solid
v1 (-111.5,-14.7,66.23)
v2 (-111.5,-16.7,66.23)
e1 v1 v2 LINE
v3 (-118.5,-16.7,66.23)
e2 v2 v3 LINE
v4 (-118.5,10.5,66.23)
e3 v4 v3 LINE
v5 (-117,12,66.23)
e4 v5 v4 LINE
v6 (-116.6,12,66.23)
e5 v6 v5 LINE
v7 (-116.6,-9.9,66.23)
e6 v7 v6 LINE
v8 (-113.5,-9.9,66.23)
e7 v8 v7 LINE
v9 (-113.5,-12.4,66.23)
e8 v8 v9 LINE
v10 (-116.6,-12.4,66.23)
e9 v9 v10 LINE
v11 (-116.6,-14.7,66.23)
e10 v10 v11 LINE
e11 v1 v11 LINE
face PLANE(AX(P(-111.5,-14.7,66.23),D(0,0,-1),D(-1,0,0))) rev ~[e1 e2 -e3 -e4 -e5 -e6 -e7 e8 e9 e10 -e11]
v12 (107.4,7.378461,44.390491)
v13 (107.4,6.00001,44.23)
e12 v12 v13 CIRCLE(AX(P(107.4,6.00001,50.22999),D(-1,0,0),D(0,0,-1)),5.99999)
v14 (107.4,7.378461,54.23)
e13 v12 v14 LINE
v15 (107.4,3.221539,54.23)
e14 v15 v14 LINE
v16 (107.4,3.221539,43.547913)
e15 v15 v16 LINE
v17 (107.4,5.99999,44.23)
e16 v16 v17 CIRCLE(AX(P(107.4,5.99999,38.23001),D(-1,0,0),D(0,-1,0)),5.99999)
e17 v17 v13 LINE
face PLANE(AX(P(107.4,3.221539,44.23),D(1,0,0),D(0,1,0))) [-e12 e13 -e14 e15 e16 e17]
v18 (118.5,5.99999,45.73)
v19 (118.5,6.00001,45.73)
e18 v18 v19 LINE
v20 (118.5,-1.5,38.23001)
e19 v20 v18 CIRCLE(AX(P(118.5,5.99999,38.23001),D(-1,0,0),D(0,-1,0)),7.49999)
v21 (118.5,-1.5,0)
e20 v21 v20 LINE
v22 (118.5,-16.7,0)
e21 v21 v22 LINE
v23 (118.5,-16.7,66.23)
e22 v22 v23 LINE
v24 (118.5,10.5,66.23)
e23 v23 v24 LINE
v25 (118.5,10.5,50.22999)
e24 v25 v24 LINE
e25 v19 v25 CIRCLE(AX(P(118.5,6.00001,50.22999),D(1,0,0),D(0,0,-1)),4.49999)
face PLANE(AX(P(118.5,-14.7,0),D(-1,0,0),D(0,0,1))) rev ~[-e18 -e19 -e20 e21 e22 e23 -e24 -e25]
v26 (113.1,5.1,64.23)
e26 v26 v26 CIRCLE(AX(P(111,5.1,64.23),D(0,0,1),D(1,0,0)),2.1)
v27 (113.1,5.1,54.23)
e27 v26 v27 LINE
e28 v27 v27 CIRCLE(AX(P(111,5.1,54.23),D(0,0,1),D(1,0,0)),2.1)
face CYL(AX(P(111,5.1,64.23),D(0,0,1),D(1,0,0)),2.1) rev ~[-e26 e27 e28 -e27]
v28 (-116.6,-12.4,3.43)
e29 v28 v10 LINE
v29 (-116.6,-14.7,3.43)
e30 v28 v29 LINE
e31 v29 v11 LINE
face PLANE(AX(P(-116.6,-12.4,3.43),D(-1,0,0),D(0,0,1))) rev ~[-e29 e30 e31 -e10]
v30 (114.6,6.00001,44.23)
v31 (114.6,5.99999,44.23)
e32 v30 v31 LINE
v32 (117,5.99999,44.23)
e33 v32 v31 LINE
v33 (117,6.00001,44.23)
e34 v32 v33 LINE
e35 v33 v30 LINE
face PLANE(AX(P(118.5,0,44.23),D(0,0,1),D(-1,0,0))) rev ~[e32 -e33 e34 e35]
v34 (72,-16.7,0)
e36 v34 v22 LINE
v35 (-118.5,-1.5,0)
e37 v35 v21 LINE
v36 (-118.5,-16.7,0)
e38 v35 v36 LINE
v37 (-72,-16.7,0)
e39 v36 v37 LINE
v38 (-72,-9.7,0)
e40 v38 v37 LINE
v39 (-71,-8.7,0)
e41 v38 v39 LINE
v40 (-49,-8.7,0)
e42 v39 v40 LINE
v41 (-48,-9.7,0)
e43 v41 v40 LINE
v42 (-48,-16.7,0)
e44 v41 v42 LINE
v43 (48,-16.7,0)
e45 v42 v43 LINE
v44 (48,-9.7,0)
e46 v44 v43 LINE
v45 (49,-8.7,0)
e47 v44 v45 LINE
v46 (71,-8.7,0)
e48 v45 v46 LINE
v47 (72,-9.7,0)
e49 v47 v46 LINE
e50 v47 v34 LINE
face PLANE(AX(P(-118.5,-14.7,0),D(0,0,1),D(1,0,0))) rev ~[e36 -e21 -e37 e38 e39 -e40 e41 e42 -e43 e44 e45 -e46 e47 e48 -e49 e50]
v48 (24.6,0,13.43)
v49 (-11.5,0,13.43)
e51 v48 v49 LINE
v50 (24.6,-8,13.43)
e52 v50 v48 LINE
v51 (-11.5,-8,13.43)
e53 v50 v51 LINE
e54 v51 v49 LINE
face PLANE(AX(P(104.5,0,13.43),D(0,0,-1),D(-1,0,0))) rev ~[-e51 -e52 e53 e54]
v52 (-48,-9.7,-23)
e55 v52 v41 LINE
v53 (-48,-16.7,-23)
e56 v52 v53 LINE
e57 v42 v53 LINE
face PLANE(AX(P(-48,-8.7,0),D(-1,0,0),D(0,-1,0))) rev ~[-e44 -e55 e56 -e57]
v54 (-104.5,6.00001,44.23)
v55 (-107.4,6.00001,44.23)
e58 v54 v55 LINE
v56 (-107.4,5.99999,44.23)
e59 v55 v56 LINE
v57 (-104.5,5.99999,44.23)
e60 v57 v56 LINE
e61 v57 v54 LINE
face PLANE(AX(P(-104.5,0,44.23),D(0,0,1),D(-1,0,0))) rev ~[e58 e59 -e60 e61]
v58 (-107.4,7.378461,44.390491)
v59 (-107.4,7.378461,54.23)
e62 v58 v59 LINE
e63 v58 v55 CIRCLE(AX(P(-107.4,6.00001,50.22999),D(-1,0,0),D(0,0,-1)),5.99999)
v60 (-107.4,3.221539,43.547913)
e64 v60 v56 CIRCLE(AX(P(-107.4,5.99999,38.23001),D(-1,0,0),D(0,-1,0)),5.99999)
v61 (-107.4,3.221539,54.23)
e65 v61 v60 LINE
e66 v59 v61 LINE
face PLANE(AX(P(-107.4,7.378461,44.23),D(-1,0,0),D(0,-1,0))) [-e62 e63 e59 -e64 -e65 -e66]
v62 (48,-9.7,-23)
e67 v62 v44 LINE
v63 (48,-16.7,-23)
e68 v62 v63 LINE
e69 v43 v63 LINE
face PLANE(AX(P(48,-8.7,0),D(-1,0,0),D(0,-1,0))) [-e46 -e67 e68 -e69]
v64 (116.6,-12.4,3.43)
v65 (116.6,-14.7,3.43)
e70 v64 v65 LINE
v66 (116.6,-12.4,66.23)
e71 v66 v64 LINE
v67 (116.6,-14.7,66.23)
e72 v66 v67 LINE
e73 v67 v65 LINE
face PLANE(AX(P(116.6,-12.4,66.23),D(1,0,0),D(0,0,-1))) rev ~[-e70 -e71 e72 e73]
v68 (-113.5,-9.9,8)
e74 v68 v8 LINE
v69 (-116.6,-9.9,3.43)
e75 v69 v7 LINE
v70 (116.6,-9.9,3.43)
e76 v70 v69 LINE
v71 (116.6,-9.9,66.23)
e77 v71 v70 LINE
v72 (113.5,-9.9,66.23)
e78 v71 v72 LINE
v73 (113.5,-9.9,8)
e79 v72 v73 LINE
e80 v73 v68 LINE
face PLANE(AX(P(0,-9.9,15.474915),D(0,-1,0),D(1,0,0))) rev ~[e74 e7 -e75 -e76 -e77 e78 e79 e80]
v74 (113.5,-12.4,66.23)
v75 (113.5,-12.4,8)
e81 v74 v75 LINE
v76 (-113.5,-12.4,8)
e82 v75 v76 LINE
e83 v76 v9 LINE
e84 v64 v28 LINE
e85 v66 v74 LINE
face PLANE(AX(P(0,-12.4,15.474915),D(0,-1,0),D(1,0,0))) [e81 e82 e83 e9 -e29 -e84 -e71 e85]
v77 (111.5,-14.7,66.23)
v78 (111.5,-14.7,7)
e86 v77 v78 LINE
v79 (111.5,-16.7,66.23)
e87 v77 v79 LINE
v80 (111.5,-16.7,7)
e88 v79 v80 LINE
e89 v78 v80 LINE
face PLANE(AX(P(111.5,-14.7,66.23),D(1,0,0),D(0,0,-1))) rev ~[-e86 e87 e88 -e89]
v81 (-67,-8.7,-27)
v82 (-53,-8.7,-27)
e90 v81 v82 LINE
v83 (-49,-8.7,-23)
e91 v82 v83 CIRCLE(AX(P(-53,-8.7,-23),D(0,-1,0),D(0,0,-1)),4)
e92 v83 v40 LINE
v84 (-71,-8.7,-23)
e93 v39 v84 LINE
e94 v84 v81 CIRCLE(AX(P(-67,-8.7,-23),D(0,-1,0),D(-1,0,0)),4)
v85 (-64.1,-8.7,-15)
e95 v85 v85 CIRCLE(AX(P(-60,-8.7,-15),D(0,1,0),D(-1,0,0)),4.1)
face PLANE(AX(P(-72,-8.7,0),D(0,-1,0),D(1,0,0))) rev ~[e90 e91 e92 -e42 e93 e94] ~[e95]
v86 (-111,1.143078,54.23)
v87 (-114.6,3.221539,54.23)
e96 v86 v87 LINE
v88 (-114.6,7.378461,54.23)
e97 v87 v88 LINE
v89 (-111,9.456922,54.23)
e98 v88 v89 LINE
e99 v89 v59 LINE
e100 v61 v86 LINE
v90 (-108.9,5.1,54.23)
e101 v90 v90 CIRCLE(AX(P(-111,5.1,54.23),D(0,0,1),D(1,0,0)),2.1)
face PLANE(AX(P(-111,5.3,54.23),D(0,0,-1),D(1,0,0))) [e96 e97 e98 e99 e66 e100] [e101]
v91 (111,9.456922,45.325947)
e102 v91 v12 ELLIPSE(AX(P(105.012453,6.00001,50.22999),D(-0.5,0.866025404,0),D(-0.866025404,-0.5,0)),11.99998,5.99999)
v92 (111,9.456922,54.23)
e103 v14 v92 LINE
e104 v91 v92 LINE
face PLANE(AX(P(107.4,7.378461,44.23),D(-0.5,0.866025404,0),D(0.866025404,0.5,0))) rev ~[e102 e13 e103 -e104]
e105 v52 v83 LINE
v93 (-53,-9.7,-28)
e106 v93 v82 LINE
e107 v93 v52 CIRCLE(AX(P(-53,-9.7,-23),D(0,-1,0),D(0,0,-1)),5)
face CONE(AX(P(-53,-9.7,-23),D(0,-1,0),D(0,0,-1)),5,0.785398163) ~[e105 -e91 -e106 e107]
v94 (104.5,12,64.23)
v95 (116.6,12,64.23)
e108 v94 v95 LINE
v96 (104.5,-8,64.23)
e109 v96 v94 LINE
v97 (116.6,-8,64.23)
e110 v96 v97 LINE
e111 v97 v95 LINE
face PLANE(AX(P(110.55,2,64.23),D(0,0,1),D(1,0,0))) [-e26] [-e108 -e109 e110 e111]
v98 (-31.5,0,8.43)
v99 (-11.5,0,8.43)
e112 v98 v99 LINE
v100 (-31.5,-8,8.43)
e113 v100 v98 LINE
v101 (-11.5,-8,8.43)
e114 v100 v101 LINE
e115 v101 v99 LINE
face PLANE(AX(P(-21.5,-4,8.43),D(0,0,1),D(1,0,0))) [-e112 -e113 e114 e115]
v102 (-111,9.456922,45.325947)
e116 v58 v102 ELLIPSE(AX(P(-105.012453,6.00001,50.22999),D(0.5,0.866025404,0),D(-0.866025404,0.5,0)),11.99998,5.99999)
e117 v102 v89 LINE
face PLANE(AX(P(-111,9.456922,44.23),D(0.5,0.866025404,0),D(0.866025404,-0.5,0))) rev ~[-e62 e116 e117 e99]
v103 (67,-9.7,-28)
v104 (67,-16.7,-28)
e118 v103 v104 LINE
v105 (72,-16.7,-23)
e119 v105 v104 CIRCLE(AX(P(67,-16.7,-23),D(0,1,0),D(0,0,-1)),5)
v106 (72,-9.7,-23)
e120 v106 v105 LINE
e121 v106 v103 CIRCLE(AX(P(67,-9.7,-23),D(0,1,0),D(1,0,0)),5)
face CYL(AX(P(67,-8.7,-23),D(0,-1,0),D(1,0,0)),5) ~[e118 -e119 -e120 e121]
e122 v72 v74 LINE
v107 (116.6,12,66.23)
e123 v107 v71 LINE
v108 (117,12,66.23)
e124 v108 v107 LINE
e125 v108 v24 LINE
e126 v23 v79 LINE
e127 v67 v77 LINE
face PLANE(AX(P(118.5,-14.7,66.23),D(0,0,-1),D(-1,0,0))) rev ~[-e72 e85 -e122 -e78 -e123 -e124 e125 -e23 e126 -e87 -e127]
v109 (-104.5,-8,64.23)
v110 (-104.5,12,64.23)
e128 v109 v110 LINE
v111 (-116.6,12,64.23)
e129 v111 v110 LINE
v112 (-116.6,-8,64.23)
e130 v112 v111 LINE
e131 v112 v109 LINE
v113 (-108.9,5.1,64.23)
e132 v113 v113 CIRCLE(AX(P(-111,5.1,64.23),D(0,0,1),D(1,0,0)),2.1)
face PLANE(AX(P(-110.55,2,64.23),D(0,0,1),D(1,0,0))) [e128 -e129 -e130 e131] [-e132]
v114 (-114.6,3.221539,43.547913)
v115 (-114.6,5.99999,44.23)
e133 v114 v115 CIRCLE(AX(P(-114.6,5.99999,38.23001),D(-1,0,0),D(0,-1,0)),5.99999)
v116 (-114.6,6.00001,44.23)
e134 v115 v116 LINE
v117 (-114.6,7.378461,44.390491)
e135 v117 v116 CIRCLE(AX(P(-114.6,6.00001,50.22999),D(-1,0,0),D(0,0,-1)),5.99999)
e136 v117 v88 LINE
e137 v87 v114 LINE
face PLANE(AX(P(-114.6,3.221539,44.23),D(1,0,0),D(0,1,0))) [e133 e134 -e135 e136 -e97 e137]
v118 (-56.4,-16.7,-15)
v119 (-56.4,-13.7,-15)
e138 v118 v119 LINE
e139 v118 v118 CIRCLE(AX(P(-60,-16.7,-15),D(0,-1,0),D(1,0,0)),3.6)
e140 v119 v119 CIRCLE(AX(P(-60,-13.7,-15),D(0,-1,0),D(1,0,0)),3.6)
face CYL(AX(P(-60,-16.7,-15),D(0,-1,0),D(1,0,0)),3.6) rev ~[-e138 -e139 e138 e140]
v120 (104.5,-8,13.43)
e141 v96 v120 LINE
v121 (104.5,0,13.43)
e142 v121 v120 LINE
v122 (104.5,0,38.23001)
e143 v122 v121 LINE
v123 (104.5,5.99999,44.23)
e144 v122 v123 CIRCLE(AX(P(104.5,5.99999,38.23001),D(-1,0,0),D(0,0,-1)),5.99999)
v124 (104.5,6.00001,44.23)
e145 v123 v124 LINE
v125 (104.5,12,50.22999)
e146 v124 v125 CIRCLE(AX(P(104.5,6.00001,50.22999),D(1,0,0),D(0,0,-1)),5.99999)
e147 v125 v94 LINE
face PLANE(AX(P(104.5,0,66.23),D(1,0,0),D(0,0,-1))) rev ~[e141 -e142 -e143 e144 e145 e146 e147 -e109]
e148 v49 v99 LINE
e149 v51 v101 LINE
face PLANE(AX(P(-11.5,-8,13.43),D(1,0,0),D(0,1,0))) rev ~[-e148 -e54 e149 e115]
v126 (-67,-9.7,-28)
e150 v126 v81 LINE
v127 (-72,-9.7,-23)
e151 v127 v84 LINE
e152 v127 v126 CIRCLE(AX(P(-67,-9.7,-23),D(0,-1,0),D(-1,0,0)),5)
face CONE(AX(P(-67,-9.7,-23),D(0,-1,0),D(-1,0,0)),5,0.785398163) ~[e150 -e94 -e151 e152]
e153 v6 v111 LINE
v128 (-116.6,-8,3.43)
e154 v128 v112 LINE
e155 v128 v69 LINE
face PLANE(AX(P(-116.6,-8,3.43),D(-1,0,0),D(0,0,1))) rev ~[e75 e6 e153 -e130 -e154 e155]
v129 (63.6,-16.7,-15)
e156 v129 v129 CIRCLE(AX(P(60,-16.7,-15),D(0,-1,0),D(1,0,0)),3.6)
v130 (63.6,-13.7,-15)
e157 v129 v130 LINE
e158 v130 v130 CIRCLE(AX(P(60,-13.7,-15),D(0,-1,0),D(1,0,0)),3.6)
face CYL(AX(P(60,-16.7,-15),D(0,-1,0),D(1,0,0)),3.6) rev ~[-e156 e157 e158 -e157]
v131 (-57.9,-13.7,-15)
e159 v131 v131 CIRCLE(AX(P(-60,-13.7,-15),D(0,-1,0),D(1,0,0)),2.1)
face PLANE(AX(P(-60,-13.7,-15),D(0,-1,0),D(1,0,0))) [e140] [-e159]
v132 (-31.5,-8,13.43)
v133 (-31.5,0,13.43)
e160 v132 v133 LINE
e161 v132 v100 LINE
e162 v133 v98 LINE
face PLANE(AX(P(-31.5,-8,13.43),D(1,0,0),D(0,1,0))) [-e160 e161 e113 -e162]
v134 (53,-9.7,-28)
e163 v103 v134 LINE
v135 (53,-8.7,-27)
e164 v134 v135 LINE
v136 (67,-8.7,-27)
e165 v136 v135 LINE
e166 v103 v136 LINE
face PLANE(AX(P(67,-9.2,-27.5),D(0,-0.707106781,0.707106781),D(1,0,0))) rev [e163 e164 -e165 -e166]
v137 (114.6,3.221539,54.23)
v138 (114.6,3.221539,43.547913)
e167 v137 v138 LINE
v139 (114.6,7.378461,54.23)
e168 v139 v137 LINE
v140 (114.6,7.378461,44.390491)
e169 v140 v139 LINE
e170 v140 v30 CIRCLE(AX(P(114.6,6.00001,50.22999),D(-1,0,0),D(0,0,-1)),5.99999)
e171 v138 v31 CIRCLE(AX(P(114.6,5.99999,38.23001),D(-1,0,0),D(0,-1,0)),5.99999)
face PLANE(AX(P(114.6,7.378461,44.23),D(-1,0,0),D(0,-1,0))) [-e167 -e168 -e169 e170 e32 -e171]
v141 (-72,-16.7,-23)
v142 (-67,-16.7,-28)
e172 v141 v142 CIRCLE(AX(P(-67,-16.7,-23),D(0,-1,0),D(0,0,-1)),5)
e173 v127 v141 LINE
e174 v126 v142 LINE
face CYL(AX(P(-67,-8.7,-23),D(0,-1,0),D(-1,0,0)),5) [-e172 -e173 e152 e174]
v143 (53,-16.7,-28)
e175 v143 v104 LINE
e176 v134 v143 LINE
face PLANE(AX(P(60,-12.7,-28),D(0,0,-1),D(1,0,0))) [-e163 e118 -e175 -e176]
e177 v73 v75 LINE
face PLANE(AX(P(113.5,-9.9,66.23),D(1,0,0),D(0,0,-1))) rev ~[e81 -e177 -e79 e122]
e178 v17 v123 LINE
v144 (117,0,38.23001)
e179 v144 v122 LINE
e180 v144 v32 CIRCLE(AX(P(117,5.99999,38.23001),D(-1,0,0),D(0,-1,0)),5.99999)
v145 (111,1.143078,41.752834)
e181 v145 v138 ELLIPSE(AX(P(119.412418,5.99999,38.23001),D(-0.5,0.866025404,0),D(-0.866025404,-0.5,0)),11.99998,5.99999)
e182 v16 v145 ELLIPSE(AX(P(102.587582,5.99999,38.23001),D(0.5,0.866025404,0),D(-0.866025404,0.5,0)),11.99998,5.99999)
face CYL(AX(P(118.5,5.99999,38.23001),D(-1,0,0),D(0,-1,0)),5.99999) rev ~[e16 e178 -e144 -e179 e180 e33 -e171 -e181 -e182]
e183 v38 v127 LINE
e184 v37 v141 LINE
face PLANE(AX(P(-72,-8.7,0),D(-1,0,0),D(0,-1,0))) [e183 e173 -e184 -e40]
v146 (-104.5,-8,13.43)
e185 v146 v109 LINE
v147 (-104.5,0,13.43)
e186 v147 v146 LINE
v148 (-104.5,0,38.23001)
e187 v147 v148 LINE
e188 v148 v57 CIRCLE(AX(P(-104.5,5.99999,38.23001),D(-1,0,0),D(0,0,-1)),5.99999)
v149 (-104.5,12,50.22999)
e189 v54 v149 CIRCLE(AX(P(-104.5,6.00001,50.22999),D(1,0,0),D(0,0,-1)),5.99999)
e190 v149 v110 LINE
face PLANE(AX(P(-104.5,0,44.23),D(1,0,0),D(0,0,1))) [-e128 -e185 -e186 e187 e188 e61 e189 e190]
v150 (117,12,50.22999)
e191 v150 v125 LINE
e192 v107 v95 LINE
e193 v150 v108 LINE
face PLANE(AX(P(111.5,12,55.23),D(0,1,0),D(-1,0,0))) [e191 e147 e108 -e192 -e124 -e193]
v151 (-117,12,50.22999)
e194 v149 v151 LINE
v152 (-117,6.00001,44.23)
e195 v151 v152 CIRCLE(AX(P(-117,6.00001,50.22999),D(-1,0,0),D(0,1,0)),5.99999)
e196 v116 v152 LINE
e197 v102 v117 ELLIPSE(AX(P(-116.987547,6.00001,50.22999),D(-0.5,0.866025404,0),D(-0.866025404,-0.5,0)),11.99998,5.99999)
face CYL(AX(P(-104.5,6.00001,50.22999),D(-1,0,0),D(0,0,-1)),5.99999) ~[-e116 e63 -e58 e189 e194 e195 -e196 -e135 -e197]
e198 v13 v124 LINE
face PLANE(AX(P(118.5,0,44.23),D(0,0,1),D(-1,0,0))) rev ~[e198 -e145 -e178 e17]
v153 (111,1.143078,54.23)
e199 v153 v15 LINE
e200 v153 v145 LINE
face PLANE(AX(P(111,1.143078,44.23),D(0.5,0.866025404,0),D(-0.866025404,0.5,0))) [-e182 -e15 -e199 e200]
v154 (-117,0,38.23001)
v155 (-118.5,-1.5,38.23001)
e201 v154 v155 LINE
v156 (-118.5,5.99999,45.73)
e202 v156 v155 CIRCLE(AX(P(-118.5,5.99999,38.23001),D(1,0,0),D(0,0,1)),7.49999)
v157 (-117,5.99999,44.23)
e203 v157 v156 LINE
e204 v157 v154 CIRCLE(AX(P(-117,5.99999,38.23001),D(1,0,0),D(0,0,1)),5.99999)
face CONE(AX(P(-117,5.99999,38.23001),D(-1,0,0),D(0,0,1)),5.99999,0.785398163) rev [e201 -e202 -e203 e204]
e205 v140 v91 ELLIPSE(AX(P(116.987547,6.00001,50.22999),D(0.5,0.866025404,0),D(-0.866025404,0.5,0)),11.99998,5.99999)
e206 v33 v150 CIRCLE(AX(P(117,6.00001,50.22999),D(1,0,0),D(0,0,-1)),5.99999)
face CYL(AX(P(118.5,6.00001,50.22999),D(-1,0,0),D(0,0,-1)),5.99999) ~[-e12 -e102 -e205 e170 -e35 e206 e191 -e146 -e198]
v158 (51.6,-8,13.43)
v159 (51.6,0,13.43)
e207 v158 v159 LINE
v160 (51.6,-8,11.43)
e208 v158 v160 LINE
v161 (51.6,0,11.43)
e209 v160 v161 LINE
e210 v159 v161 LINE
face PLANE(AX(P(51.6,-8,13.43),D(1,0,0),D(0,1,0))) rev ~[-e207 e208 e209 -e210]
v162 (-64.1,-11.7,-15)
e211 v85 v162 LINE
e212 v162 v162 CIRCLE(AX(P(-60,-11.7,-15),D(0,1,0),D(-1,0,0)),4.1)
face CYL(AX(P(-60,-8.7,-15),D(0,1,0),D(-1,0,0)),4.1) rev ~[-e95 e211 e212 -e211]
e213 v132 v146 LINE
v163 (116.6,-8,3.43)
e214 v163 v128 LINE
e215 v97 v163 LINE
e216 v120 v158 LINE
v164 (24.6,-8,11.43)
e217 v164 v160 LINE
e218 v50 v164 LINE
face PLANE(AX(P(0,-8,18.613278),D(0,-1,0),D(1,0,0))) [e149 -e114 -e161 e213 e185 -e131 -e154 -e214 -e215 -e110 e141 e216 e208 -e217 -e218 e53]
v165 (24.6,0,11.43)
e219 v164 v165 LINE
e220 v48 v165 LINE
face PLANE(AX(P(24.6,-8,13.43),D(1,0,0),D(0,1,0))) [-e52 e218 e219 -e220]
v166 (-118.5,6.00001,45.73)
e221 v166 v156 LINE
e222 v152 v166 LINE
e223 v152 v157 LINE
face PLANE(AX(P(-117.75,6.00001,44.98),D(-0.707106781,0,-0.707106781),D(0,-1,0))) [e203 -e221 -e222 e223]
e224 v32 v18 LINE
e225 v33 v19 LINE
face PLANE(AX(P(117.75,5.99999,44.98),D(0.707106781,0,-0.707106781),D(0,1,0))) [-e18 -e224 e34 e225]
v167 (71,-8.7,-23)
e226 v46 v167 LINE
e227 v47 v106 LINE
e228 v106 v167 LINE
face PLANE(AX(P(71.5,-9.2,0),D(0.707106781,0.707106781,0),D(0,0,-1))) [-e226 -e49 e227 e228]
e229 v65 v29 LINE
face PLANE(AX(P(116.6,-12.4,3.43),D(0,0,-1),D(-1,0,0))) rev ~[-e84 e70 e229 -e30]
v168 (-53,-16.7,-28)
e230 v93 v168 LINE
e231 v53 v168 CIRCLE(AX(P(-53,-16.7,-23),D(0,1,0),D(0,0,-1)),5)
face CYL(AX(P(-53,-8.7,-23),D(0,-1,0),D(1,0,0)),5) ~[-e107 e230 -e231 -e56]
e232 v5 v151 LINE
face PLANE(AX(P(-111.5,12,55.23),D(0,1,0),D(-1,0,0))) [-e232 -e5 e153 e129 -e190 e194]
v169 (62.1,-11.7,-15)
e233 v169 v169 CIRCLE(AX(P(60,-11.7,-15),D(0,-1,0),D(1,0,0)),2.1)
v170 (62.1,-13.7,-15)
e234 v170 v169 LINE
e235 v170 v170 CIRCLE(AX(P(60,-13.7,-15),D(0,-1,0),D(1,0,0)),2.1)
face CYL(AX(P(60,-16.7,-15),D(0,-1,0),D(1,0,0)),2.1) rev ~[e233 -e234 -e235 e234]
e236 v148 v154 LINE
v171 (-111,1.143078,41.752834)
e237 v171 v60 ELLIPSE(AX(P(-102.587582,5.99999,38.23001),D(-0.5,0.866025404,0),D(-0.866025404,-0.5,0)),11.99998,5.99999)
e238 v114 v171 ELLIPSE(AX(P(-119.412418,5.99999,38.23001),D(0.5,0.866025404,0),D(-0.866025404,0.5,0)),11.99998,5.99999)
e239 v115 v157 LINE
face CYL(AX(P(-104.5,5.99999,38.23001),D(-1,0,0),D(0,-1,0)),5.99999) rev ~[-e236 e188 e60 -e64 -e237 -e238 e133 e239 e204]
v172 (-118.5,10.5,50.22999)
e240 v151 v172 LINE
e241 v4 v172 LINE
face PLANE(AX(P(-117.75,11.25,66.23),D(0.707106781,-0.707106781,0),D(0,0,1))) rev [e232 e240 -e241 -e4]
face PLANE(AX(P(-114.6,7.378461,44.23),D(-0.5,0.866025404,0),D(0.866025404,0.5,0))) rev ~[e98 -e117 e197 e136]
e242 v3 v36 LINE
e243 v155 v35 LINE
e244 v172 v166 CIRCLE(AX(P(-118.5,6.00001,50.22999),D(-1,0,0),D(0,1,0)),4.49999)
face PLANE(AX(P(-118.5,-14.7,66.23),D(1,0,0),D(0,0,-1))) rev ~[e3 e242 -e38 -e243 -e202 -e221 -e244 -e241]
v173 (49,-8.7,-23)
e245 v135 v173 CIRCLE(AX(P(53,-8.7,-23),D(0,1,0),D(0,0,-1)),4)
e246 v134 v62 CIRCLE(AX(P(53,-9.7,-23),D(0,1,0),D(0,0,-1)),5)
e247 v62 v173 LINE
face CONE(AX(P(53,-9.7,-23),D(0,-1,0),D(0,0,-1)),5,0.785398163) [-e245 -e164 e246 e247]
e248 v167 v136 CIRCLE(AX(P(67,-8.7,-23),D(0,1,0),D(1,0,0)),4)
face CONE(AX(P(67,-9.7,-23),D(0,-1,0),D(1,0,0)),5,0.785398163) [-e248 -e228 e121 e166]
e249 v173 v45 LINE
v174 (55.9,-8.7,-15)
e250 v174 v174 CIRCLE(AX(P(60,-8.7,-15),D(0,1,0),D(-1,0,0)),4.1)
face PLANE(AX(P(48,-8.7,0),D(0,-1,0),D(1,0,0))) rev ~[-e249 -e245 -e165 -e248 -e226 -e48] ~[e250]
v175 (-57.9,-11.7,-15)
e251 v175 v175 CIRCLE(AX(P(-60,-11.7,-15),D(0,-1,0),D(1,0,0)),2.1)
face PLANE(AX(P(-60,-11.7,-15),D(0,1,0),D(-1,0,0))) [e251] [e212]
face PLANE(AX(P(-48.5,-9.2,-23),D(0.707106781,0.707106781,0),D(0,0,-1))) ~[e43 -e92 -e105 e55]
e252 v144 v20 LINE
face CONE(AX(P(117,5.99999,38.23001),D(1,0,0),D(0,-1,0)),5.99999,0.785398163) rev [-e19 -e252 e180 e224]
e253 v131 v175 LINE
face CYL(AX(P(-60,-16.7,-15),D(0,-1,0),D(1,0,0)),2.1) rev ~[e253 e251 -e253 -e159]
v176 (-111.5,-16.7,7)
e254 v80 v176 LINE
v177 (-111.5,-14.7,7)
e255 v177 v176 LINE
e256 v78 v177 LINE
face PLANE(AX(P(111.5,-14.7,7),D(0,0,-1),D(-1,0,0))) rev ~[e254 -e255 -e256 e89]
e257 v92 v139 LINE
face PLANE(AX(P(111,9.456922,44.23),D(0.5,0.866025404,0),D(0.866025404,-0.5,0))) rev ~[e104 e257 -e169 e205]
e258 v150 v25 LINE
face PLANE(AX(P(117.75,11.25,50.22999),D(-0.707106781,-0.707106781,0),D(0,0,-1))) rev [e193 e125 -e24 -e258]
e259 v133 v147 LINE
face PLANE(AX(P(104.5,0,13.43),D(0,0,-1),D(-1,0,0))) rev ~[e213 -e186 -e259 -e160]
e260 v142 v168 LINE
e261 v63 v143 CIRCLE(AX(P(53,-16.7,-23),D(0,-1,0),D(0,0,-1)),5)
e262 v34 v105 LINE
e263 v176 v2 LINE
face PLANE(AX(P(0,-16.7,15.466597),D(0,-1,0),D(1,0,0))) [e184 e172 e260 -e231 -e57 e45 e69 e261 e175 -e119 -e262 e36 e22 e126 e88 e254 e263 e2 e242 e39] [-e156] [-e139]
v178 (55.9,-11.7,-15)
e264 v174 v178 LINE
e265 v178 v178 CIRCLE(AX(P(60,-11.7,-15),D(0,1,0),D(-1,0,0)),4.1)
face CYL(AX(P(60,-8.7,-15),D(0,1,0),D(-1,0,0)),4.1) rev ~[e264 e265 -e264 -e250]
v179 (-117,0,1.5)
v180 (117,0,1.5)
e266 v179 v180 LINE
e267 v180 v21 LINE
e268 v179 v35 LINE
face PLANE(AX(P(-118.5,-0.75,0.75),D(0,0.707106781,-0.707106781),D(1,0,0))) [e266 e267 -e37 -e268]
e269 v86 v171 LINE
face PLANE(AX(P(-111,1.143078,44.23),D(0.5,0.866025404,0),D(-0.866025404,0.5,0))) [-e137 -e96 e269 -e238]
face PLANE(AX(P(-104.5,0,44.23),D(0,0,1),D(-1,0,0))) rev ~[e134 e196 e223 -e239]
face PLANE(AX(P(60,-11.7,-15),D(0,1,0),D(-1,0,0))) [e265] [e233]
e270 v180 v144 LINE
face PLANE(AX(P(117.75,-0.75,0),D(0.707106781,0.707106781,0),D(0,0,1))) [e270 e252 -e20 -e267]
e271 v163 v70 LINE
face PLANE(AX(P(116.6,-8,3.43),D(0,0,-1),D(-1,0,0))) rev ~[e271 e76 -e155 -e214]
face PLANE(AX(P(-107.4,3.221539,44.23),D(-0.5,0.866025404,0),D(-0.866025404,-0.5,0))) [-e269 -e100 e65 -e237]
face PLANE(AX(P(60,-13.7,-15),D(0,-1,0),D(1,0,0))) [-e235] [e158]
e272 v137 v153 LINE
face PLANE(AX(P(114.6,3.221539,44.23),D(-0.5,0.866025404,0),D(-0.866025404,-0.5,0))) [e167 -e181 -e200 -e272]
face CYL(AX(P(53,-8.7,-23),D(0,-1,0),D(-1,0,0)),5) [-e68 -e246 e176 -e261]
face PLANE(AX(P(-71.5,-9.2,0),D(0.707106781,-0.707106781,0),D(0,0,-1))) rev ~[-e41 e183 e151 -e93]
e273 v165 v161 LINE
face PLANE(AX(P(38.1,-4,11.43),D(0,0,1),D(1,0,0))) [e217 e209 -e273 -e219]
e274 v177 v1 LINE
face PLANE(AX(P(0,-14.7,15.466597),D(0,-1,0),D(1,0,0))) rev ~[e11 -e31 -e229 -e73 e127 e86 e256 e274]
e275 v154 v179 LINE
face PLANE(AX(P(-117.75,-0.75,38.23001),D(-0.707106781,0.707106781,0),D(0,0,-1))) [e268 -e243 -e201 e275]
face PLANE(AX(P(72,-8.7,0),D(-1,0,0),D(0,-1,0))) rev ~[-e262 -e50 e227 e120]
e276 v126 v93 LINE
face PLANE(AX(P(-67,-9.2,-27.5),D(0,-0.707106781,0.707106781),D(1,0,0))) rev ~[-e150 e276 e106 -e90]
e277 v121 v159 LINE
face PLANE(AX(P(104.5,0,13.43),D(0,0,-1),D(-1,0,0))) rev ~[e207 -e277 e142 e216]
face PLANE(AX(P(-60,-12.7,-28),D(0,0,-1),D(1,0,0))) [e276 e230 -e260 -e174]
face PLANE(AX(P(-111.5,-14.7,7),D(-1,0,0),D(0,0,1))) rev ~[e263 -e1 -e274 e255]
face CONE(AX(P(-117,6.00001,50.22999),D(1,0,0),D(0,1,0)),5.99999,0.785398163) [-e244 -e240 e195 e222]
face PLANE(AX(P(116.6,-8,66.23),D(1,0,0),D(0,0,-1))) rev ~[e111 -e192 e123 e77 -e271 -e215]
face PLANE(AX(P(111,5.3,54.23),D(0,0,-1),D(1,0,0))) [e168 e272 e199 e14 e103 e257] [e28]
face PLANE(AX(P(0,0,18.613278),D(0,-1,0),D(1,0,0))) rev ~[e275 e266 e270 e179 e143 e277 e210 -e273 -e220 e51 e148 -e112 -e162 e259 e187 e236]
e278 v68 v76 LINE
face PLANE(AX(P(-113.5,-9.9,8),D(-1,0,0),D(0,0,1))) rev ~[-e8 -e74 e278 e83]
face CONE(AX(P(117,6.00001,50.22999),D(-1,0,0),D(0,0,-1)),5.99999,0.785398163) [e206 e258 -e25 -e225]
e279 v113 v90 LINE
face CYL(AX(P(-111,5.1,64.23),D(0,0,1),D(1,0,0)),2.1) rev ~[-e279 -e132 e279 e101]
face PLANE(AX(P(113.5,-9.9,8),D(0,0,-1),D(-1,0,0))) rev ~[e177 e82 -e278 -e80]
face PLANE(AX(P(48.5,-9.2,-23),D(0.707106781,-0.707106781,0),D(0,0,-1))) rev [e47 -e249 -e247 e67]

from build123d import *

# Parameters (mm, degrees)
F1_DEPTH  = 8
F3_DEPTH  = 1.9
F5_DEPTH  = 2.5
F7_DEPTH  = 2.3
F9_W      = 14
F9_H      = 22
F10_DEPTH = 12
F11_DEPTH = 2
F12_W     = 12.1
F12_H     = 20
F13_W     = 12.1
F13_H     = 20
F14_DEPTH = 2
F17_R     = 5.99999
F18_R     = 5.99999
F19_DEPTH = 10
F20_DEPTH = 25
F22_R     = 2.1
F21_R     = 2.1
F23_DEPTH = 10
F24_SIZE  = 1.5
F25_W     = 24
F25_H     = 8
F26_DEPTH = 28
F28_R     = 4.1
F27_R     = 4.1
F29_DEPTH = 3
F30_R     = 2.1
F31_DEPTH = 28.701
F32_R     = 3.6
F33_DEPTH = 3
F34_R     = 5
F35_W     = 20
F35_H     = 8
F36_DEPTH = 5
F37_SIZE  = 1
F38_W     = 27
F38_H     = 8
F39_DEPTH = 2


# Not quite as in the source:
# - a fillet or chamfer is up to 0.001 mm smaller than in the source, because OpenCascade refuses the exact size
# - a feature names something its author has since deleted; it is built from what else it names


with BuildPart() as f1:
    # F0 (on Front) → F1 (new body)
    with BuildSketch(Plane.XZ):
        Polygon((-118.5, 0), (118.5, 0), (118.5, 66.23), (104.5, 66.23), (104.5, 13.43), (-104.5, 13.43), (-104.5, 66.23), (-118.5, 66.23), align=None)
    extrude(amount=F1_DEPTH)

    # F2 (on face) → F3 (join)
    with BuildSketch(Plane.XZ.offset(8)):
        Polygon((-116.6, 66.23), (-118.5, 66.23), (-118.5, 0), (118.5, 0), (118.5, 66.23), (116.6, 66.23), (116.6, 3.43), (-116.6, 3.43), align=None)
    extrude(amount=F3_DEPTH)

    # F4 (on face) → F5 (join)
    with BuildSketch(Plane.XZ.offset(9.9)):
        Polygon((-113.5, 66.23), (-118.5, 66.23), (-118.5, 0), (118.5, 0), (118.5, 66.23), (113.5, 66.23), (113.5, 8), (-113.5, 8), align=None)
    extrude(amount=F5_DEPTH)

    # F6 (on face) → F7 (join)
    with BuildSketch(Plane.XZ.offset(12.4)):
        Polygon((-116.6, 66.23), (-118.5, 66.23), (-118.5, 0), (118.5, 0), (118.5, 66.23), (116.6, 66.23), (116.6, 3.43), (-116.6, 3.43), align=None)
    extrude(amount=F7_DEPTH)

    # F9 (on face) → F10 (join)
    with BuildSketch(Plane(origin=(0, 0, 0), x_dir=(-1, 0, 0), z_dir=(0, 1, 0))):
        with Locations((111.5, 55.23)):
            Rectangle(F9_W, F9_H)
        with Locations((-111.5, 55.23)):
            Rectangle(F9_W, F9_H)
    extrude(amount=F10_DEPTH)

    # F8 (on face) → F11 (join)
    with BuildSketch(Plane.XZ.offset(14.7)):
        Polygon((-111.5, 66.23), (-118.5, 66.23), (-118.5, 0), (118.5, 0), (118.5, 66.23), (111.5, 66.23), (111.5, 7), (-111.5, 7), align=None)
    extrude(amount=F11_DEPTH)

    # F12 (on face) + F13 (on face) → F14 (cut)
    with BuildSketch(Plane.XY.offset(66.23)):
        with Locations((-110.55, 2)):
            Rectangle(F12_W, F12_H)
    with BuildSketch(Plane.XY.offset(66.23)):
        with Locations((110.55, 2)):
            Rectangle(F13_W, F13_H)
    extrude(amount=-F14_DEPTH, mode=Mode.SUBTRACT)

    # F17 (radius 6 in the source; OpenCascade refuses exactly that, so slightly less here)
    f17_edges = [f1.edges().sort_by_distance(p)[0] for p in [
        (-111.5, 0, 44.23),
        (-111.5, 12, 44.23),
    ]]
    fillet(f17_edges, radius=F17_R)

    # F18 (radius 6 in the source; OpenCascade refuses exactly that, so slightly less here)
    f18_edges = [f1.edges().sort_by_distance(p)[0] for p in [
        (111.5, 0, 44.23),
        (111.5, 12, 44.23),
    ]]
    fillet(f18_edges, radius=F18_R)

    # F15 (on face) + F16 (on face) → F19 (cut)
    with BuildSketch(Plane(origin=(0, 0, 44.23), x_dir=(1, 0, 0), z_dir=(0, 0, -1))):
        Polygon((111, -1.1430780618), (107.4, -3.2215390309), (107.4, -7.3784609691), (111, -9.4569219382), (114.6, -7.3784609691), (114.6, -3.2215390309), align=None)
    with BuildSketch(Plane(origin=(0, 0, 44.23), x_dir=(1, 0, 0), z_dir=(0, 0, -1))):
        Polygon((-107.4, -7.3784609691), (-107.4, -3.2215390309), (-111, -1.1430780618), (-114.6, -3.2215390309), (-114.6, -7.3784609691), (-111, -9.4569219382), align=None)
    extrude(amount=-F19_DEPTH, mode=Mode.SUBTRACT)

    # F15 (on face) + F16 (on face) → F20 (cut)
    with BuildSketch(Plane(origin=(0, 0, 44.23), x_dir=(1, 0, 0), z_dir=(0, 0, -1))):
        Polygon((111, -1.1430780618), (107.4, -3.2215390309), (107.4, -7.3784609691), (111, -9.4569219382), (114.6, -7.3784609691), (114.6, -3.2215390309), align=None)
    with BuildSketch(Plane(origin=(0, 0, 44.23), x_dir=(1, 0, 0), z_dir=(0, 0, -1))):
        Polygon((-107.4, -7.3784609691), (-107.4, -3.2215390309), (-111, -1.1430780618), (-114.6, -3.2215390309), (-114.6, -7.3784609691), (-111, -9.4569219382), align=None)
    extrude(amount=F20_DEPTH, mode=Mode.SUBTRACT)

    # F22 (on face) + F21 (on face) → F23 (cut, through all)
    with BuildSketch(Plane.XY.offset(64.23)):
        with Locations((111, 5.1)):
            Circle(F22_R)
    with BuildSketch(Plane.XY.offset(64.23)):
        with Locations((-111, 5.1)):
            Circle(F21_R)
    extrude(amount=-F23_DEPTH, mode=Mode.SUBTRACT)

    # F24
    f24_edges = [f1.edges().sort_by_distance(p)[0] for p in [
        (118.5, 0, 19.115005),
        (-118.5, 0, 19.115005),
        (0, 0, 0),
        (118.5, 12, 58.229995),
        (118.5, 10.242644, 45.987356),
        (118.5, 6, 44.23),
        (118.5, 1.757356, 42.472644),
        (-118.5, 1.757356, 42.472644),
        (-118.5, 6, 44.23),
        (-118.5, 10.242644, 45.987356),
        (-118.5, 12, 58.229995),
    ]]
    chamfer(f24_edges, length=F24_SIZE)

    # F25 (on face) → F26 (join)
    with BuildSketch(Plane(origin=(0, 0, 0), x_dir=(1, 0, 0), z_dir=(0, 0, -1))):
        with Locations((-60, 12.7)):
            Rectangle(F25_W, F25_H)
        with Locations((60, 12.7)):
            Rectangle(F25_W, F25_H)
    extrude(amount=F26_DEPTH)

    # F28 (on face) + F27 (on face) → F29 (cut)
    with BuildSketch(Plane(origin=(0, -8.7, 0), x_dir=(-1, 0, 0), z_dir=(0, 1, 0))):
        with Locations((-60, -15)):
            Circle(F28_R)
    with BuildSketch(Plane(origin=(0, -8.7, 0), x_dir=(-1, 0, 0), z_dir=(0, 1, 0))):
        with Locations((60, -15)):
            Circle(F27_R)
    extrude(amount=-F29_DEPTH, mode=Mode.SUBTRACT)

    # F30 (on face) → F31 (cut, through all)
    with BuildSketch(Plane.XZ.offset(16.7)):
        with Locations((-60, -15)):
            Circle(F30_R)
        with Locations((60, -15)):
            Circle(F30_R)
    extrude(amount=-F31_DEPTH, mode=Mode.SUBTRACT)

    # F32 (on face) → F33 (cut)
    with BuildSketch(Plane.XZ.offset(16.7)):
        with Locations((-60, -15)):
            Circle(F32_R)
        with Locations((60, -15)):
            Circle(F32_R)
    extrude(amount=-F33_DEPTH, mode=Mode.SUBTRACT)

    # F34
    f34_edges = [f1.edges().sort_by_distance(p)[0] for p in [
        (-72, -12.7, -28),
        (-48, -12.7, -28),
        (48, -12.7, -28),
        (72, -12.7, -28),
    ]]
    fillet(f34_edges, radius=F34_R)

    # F35 (on face) → F36 (cut)
    with BuildSketch(Plane.XY.offset(13.43)):
        with Locations((-21.5, -4)):
            Rectangle(F35_W, F35_H)
    extrude(amount=-F36_DEPTH, mode=Mode.SUBTRACT)

    # F37
    f37_edges = [f1.edges().sort_by_distance(p)[0] for p in [
        (-72, -8.7, -11.5),
        (72, -8.7, -11.5),
        (48, -8.7, -11.5),
        (-48, -8.7, -11.5),
        (-70.535534, -8.7, -26.535534),
        (-60, -8.7, -28),
        (-49.464466, -8.7, -26.535534),
        (49.464466, -8.7, -26.535534),
        (60, -8.7, -28),
        (70.535534, -8.7, -26.535534),
    ]]
    chamfer(f37_edges, length=F37_SIZE)

    # F38 (on face) → F39 (cut)
    with BuildSketch(Plane.XY.offset(13.43)):
        with Locations((38.1, -4)):
            Rectangle(F38_W, F38_H)
    extrude(amount=-F39_DEPTH, mode=Mode.SUBTRACT)


solid = f1.part
